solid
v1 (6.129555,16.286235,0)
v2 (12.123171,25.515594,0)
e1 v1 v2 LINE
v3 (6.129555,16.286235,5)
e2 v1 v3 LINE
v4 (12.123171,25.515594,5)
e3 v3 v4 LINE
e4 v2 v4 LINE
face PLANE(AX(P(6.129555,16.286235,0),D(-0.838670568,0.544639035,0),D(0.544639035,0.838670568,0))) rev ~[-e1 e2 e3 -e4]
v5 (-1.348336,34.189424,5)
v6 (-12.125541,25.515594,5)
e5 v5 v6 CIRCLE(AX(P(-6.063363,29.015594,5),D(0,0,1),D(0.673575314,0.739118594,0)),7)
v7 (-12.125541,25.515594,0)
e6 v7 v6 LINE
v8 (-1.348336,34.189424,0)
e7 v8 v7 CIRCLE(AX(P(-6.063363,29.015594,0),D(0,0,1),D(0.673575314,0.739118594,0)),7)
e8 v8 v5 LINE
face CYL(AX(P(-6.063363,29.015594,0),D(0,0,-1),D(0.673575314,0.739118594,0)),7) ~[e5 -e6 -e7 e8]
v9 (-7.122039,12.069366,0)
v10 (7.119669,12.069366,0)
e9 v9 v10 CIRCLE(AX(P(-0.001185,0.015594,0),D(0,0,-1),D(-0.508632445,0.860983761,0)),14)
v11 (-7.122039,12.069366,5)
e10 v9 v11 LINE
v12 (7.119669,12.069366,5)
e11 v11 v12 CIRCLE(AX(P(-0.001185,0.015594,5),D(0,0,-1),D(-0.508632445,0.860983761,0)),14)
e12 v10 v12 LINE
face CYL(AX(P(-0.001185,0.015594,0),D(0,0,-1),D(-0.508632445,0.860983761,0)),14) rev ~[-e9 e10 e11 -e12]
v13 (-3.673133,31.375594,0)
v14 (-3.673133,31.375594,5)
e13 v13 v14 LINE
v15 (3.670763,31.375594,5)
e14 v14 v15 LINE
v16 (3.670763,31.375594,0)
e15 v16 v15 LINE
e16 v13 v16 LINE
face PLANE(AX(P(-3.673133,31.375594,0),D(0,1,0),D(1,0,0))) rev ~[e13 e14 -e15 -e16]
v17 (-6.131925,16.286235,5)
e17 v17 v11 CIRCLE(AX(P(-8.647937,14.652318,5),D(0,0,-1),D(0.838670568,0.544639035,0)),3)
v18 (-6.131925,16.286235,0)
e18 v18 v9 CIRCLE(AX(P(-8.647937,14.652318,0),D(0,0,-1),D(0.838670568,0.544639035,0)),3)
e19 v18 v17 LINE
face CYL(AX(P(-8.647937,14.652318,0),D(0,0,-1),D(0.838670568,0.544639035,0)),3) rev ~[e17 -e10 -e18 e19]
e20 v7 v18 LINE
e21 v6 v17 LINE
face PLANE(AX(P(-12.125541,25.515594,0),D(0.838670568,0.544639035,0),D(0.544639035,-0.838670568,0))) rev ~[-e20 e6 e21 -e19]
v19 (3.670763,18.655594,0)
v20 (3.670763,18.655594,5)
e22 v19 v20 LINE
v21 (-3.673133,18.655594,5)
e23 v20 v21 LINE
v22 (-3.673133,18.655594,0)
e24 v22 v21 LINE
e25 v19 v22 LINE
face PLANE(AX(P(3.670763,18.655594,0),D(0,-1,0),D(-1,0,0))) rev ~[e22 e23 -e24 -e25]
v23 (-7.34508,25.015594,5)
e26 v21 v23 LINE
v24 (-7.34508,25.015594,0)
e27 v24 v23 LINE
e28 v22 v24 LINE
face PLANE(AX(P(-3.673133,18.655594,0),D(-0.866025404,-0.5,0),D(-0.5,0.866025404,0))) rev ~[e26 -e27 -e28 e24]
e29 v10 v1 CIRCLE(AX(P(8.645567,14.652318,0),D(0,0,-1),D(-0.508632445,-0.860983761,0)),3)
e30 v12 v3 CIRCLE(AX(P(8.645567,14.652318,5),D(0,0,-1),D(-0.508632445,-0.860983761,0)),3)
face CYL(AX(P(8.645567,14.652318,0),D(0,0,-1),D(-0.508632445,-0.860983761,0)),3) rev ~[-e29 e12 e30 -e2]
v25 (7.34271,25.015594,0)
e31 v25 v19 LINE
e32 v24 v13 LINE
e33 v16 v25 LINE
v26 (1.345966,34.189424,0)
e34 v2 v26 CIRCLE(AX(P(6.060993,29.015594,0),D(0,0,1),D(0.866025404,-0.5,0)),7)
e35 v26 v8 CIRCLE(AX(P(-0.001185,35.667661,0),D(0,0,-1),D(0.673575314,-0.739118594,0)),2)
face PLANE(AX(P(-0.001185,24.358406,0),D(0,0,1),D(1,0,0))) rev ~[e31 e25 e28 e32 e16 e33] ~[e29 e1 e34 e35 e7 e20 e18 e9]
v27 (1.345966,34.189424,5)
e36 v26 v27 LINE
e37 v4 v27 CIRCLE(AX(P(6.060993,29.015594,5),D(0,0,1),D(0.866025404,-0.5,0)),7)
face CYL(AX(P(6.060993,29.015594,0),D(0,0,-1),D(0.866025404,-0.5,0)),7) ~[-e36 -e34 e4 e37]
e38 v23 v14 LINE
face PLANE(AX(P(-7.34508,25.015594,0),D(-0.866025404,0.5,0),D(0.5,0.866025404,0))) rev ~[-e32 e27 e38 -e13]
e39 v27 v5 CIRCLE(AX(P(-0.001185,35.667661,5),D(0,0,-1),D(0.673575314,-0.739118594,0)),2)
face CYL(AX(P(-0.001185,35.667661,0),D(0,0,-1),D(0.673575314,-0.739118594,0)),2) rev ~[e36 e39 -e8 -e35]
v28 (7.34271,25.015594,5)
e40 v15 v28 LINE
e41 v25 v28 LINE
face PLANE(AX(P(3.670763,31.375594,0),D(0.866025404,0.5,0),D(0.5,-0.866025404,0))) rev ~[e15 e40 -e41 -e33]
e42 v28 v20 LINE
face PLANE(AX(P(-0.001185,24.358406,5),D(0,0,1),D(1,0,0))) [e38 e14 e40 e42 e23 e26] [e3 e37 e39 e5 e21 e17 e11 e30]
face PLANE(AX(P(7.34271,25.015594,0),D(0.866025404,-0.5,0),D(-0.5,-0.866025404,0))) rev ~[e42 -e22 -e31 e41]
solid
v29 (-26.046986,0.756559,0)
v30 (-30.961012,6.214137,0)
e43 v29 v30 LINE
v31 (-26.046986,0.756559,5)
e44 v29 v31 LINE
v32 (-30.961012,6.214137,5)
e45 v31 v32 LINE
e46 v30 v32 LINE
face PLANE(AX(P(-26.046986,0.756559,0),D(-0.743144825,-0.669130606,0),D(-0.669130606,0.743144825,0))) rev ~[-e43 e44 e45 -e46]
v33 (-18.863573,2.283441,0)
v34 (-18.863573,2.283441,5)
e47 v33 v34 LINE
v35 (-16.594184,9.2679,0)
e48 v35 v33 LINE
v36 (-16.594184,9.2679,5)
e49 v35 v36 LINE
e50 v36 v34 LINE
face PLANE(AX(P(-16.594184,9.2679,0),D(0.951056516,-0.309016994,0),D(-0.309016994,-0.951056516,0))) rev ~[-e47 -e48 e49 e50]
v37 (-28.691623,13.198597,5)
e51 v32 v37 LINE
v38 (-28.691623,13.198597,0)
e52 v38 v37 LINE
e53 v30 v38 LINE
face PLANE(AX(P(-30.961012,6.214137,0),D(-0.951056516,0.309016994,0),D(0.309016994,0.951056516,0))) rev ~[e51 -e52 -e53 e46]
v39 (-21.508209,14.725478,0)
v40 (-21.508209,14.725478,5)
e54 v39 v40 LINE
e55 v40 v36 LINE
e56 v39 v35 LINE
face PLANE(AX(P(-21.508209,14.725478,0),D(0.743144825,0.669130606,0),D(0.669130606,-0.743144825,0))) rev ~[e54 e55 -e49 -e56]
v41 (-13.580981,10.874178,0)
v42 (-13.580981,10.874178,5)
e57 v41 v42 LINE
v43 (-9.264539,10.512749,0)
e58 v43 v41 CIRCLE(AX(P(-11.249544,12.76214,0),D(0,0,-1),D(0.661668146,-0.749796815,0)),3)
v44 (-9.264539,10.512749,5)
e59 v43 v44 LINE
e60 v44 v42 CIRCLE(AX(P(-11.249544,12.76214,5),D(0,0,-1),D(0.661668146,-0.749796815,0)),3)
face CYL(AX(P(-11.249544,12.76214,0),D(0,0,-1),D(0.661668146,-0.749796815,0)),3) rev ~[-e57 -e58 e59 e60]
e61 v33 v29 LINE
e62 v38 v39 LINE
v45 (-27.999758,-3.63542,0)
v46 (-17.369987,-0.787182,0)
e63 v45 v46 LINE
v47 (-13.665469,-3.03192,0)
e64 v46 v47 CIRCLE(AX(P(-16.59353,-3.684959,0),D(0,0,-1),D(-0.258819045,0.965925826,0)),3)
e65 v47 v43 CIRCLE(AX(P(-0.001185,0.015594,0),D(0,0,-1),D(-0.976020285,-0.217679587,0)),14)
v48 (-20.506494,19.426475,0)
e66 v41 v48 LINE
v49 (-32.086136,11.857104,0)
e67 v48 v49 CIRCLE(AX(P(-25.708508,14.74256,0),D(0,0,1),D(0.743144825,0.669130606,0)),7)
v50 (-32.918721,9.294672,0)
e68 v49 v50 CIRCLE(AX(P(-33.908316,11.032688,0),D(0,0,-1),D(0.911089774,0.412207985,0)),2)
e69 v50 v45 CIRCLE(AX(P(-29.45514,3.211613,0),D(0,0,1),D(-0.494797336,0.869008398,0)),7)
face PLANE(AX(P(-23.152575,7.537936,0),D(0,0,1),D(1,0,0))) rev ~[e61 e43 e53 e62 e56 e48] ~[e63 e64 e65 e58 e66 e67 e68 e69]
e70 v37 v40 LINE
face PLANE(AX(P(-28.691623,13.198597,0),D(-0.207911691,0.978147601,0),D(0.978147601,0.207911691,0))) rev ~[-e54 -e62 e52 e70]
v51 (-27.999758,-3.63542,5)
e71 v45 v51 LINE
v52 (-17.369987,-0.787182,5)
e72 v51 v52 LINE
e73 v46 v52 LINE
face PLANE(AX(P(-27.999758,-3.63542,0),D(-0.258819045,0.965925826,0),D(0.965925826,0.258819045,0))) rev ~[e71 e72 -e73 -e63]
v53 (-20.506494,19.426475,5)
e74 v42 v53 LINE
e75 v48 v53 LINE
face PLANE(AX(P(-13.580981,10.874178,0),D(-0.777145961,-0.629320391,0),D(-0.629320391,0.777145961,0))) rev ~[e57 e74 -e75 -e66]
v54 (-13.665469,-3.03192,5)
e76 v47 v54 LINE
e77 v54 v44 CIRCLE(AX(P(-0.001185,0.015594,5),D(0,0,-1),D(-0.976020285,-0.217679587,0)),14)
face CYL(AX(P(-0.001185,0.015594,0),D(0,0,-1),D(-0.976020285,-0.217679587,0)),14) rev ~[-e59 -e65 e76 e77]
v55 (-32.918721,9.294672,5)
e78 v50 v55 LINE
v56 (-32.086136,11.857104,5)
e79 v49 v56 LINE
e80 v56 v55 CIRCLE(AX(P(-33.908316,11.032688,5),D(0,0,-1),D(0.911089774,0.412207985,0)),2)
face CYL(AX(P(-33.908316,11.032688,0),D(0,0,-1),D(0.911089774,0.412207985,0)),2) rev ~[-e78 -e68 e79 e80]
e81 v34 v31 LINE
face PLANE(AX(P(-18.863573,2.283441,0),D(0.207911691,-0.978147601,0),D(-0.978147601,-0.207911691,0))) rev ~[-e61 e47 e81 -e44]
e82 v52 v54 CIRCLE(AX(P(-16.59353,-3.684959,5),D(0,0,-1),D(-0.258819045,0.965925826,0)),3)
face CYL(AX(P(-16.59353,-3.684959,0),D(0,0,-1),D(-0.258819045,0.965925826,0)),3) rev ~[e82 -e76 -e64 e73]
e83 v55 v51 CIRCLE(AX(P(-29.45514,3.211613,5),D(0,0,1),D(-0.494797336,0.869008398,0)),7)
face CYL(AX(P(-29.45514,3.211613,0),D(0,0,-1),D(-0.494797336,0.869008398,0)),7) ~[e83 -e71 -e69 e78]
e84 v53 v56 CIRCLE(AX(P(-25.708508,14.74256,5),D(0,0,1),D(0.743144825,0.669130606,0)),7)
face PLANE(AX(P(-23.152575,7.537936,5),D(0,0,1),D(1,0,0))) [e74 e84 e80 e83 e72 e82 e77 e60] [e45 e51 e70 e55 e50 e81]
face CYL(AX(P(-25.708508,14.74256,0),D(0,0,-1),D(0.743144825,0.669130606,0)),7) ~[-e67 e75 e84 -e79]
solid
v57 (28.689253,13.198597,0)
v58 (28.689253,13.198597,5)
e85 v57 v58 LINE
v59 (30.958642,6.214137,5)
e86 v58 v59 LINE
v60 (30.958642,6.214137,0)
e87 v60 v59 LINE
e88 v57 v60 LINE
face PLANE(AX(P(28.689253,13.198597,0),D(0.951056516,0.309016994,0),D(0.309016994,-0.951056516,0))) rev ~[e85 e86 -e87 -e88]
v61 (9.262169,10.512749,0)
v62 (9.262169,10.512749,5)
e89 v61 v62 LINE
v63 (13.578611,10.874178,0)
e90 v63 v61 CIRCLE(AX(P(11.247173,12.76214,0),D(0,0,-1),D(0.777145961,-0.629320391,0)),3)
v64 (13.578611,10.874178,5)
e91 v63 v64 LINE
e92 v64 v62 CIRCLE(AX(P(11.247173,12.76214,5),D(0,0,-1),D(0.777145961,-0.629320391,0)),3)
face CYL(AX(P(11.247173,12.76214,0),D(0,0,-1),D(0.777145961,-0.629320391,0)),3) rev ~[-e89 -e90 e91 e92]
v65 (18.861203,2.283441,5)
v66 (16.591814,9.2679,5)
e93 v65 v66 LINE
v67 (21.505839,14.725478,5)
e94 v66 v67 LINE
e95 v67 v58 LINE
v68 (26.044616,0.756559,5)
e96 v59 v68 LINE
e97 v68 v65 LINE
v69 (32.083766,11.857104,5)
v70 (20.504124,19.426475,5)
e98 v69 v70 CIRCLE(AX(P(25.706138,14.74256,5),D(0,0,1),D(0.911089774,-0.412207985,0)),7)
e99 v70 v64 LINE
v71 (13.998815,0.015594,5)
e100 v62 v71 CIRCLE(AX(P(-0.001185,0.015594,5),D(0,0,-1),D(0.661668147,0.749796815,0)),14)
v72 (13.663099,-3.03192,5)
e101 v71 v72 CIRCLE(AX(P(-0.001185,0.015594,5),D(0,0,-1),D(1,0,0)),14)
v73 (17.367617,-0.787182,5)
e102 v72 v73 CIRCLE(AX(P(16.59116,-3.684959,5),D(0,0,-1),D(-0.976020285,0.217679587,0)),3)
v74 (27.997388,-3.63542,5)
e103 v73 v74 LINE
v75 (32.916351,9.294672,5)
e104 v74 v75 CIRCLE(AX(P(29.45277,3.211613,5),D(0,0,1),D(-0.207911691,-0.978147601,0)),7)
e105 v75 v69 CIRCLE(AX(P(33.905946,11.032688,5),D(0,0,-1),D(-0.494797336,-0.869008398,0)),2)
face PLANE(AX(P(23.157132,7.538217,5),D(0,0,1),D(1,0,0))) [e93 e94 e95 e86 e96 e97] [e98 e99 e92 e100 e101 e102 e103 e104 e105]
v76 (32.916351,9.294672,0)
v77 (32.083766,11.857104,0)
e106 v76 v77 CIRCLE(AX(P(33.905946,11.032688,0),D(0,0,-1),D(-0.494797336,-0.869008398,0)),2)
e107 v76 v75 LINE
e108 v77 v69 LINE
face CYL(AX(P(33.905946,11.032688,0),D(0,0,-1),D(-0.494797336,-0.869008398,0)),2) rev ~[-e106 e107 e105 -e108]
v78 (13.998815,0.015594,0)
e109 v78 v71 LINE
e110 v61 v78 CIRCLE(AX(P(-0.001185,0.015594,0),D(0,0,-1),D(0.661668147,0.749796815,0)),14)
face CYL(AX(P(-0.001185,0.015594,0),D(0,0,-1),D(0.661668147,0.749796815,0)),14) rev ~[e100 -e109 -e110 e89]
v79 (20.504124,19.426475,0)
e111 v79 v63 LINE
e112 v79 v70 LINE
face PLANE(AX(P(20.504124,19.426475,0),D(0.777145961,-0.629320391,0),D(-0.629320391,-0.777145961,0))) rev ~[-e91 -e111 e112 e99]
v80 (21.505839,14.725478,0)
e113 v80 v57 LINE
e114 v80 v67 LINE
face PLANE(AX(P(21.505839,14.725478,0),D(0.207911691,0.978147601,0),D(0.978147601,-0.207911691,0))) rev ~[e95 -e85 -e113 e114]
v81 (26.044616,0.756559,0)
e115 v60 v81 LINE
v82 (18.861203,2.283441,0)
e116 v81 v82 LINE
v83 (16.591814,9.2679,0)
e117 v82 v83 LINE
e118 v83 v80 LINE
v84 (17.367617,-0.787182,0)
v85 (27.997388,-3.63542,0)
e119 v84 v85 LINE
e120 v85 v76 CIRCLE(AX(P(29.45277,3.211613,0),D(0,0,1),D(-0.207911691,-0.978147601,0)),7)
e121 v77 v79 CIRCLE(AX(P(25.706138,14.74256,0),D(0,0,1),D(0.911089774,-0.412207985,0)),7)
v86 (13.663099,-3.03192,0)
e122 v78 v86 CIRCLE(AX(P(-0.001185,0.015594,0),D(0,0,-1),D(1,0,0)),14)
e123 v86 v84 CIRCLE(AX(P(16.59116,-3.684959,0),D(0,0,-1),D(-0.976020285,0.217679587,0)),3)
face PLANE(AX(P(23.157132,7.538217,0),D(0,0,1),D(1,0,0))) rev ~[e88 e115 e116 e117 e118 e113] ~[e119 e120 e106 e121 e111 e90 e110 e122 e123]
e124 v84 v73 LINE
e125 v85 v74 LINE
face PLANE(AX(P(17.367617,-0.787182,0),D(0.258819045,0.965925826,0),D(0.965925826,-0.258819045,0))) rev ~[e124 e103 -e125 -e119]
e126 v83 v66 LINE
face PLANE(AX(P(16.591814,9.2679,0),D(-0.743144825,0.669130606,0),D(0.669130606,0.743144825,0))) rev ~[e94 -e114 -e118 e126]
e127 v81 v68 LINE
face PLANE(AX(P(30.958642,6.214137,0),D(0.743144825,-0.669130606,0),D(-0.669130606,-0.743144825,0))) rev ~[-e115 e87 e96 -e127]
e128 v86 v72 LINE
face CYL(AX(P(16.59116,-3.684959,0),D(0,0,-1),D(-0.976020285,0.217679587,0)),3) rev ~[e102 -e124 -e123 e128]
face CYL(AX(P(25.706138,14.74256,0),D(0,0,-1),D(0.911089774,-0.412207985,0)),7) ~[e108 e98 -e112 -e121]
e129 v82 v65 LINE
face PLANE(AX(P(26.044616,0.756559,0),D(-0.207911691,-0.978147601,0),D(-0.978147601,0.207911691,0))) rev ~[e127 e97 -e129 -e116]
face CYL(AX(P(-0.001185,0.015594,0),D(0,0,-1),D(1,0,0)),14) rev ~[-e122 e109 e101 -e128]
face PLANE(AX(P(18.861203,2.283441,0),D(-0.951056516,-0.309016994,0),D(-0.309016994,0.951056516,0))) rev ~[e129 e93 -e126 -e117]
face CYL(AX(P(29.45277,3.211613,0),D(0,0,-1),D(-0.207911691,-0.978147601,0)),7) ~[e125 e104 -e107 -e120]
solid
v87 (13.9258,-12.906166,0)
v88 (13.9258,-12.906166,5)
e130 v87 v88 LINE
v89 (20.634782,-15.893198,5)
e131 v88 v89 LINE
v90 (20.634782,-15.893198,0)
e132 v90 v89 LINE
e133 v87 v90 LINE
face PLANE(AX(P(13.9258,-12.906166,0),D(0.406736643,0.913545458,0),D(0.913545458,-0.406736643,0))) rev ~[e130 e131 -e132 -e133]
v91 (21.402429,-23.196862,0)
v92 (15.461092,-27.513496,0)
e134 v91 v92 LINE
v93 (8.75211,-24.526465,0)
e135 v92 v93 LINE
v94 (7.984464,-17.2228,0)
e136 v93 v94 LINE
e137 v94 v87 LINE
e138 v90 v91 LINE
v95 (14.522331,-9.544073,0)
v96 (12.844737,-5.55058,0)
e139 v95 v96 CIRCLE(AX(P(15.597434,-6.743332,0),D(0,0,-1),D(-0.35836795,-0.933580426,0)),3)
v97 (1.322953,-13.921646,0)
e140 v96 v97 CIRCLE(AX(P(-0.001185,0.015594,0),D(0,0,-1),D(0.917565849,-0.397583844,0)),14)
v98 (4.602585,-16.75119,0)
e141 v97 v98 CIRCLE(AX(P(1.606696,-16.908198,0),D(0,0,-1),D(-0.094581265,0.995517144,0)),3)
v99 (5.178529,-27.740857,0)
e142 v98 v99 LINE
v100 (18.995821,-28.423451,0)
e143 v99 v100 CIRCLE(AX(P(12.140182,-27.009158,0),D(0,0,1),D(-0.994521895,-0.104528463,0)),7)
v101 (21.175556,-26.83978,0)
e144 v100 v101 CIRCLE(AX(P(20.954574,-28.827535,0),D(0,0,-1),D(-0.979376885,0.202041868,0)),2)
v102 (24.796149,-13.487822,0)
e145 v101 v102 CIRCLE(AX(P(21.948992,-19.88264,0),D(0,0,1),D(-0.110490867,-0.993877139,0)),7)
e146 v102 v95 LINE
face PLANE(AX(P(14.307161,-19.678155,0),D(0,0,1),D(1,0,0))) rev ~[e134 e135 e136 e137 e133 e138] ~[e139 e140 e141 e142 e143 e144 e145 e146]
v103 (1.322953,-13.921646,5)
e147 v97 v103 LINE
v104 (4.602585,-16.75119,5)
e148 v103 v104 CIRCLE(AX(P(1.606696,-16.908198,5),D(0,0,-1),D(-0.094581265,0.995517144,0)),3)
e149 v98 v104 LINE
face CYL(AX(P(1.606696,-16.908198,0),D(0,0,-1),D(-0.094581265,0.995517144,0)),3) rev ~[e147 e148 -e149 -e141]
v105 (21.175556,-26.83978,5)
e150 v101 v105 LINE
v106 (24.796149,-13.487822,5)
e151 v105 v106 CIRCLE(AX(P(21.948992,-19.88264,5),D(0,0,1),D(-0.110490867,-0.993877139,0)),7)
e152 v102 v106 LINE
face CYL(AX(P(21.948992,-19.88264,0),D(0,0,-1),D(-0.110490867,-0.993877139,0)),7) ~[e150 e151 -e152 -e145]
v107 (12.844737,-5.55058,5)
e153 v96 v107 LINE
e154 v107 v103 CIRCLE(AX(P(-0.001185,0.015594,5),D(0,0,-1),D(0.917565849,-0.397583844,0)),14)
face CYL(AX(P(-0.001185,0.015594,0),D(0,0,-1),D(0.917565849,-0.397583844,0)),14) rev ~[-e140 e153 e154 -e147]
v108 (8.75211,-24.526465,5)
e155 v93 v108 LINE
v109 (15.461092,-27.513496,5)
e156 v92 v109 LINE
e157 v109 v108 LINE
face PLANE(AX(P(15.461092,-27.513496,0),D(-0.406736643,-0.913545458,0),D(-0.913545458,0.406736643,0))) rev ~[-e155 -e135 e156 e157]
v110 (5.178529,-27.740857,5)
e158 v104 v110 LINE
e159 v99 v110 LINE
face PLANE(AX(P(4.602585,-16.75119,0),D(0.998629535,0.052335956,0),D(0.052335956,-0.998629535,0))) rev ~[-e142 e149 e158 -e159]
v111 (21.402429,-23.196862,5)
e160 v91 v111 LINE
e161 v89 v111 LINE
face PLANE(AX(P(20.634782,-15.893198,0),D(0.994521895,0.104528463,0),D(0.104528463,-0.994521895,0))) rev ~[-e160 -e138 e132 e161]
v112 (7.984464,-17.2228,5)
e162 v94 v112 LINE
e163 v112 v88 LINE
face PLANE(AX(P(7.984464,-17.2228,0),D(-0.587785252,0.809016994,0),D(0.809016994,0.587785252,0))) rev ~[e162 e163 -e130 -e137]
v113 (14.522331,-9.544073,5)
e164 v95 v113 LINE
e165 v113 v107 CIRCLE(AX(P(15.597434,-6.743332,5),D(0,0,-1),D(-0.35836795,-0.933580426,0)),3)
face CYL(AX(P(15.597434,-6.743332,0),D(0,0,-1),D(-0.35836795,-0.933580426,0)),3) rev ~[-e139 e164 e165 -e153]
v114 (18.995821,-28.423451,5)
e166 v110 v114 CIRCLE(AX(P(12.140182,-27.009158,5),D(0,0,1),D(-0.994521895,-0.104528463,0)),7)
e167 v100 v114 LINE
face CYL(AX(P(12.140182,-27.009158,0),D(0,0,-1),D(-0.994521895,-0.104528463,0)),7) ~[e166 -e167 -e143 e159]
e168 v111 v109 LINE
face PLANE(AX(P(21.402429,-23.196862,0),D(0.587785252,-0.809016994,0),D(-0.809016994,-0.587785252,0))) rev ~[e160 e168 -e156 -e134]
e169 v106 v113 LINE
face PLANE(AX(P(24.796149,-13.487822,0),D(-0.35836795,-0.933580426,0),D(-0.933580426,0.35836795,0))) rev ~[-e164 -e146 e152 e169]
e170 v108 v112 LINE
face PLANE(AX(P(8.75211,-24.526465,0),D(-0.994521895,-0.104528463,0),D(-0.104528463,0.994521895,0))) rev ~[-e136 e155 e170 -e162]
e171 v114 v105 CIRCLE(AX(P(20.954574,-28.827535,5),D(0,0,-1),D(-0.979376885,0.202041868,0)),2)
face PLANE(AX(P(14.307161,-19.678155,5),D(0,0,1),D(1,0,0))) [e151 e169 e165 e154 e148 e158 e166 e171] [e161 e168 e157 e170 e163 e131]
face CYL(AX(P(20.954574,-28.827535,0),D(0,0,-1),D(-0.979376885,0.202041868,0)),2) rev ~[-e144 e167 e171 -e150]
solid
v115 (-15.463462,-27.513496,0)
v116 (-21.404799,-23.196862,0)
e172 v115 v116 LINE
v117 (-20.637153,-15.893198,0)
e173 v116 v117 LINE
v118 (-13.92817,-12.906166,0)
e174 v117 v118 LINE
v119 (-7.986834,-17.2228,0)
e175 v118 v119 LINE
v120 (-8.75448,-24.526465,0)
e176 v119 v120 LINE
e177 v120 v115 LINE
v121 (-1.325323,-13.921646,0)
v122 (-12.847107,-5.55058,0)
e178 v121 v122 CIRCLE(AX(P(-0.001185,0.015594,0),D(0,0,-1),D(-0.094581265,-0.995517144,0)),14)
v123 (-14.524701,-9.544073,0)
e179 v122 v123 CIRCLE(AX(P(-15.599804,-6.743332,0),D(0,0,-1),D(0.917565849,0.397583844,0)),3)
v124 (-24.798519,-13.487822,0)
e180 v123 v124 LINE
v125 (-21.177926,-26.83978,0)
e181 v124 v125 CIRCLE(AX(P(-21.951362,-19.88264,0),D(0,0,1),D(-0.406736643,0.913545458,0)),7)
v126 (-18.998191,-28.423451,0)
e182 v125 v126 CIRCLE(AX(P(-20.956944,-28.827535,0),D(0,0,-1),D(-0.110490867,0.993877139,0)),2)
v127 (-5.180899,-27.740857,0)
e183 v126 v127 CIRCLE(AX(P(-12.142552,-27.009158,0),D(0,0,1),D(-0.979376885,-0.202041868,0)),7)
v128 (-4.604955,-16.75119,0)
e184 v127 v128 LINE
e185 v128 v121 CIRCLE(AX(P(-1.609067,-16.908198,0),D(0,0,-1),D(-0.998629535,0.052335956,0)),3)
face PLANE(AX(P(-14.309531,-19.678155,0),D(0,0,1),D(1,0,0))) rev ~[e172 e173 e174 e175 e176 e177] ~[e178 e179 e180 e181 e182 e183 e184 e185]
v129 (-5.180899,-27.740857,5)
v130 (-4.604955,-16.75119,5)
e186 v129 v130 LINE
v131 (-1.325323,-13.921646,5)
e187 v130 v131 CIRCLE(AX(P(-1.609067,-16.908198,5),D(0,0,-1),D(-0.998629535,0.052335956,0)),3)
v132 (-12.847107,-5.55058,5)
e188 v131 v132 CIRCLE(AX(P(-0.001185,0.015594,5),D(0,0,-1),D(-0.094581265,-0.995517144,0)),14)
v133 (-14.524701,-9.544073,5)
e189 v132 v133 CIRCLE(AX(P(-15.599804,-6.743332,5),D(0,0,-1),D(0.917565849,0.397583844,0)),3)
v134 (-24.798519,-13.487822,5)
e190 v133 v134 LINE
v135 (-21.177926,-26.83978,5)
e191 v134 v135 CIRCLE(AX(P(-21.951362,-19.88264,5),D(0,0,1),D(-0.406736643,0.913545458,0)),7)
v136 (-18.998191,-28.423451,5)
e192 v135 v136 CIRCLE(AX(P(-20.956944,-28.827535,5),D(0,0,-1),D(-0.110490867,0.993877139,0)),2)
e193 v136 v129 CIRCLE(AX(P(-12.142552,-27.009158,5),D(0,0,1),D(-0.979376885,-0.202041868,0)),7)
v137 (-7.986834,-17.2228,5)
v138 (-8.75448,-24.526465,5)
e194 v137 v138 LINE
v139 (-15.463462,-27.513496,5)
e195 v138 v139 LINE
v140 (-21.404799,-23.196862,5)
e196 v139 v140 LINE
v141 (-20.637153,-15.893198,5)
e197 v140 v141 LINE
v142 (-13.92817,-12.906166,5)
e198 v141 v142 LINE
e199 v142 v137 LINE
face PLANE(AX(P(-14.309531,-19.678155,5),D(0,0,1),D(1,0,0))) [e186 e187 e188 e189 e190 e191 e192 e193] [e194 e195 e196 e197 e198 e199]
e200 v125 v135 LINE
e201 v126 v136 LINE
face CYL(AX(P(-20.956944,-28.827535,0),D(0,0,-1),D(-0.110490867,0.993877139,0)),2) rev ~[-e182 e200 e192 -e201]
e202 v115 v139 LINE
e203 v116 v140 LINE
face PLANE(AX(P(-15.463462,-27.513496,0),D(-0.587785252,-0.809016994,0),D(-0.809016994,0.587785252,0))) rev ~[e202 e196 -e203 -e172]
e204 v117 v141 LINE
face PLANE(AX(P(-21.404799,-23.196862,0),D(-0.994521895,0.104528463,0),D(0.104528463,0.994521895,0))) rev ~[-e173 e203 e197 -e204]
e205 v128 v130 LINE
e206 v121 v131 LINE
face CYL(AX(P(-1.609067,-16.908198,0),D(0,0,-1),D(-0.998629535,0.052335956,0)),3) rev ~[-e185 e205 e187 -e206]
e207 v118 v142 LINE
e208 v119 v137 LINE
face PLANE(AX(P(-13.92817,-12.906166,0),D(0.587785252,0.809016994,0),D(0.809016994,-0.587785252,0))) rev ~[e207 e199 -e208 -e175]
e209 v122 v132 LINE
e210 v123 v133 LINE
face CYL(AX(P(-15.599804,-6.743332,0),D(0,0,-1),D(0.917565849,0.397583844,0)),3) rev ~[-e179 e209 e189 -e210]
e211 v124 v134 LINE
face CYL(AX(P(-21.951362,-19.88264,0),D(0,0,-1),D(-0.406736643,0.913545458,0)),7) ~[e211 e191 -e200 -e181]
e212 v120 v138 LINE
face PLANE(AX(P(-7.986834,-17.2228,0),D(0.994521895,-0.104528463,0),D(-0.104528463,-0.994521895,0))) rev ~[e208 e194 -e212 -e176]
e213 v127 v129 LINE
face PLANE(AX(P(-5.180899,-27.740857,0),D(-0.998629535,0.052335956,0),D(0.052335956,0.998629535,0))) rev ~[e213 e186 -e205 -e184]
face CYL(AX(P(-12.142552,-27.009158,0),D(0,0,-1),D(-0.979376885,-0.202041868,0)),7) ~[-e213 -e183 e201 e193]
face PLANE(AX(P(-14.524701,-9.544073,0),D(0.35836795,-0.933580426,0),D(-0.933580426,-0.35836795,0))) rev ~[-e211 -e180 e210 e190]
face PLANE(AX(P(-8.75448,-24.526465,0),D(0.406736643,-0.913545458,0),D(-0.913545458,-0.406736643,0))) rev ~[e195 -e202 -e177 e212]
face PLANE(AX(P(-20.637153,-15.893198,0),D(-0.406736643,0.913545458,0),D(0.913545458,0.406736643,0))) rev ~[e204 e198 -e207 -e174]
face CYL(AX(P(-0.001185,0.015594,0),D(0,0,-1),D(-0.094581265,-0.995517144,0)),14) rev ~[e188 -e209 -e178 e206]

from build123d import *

# Parameters (mm, degrees)
F1_DEPTH = 5


# Not quite as in the source:
# - a feature names something its author has since deleted; it is built from what else it names


with BuildPart() as f1:
    # F0 (on Top) → F1 (new body)
    with BuildSketch(Plane.XY):
        with BuildLine():
            ThreePointArc((-13.665469042, -3.0319204432), (-13.3159762762, 4.3418317), (-9.2645390994, 10.5127491897))
            ThreePointArc((-9.2645390994, 10.5127491897), (-11.4998669549, 9.7726015122), (-13.5809814233, 10.8741784618))
            Line((-13.5809814233, 10.8741784618), (-20.506494271, 19.426474585))
            ThreePointArc((-20.506494271, 19.426474585), (-29.538567909, 20.601795911), (-32.0861364699, 11.8571044442))
            ThreePointArc((-32.0861364699, 11.8571044442), (-32.0062029861, 10.4146544851), (-32.9187213461, 9.2946716776))
            ThreePointArc((-32.9187213461, 9.2946716776), (-35.997695766, 0.7226444411), (-27.9997581563, -3.6354203143))
            Line((-27.9997581563, -3.6354203143), (-17.3699870332, -0.7871817262))
            ThreePointArc((-17.3699870332, -0.7871817262), (-15.0388393758, -1.1192356462), (-13.665469042, -3.0319204432))
        make_face()
        Polygon((-28.6916231536, 13.1985965214), (-21.5082094645, 14.7254782362), (-16.5941842664, 9.267900353), (-18.8635727573, 2.2834407549), (-26.0469864464, 0.7565590401), (-30.9610116446, 6.2141369233), align=None, mode=Mode.SUBTRACT)
    extrude(amount=F1_DEPTH)


with BuildPart() as f1b:
    # F0 (on Top) → F1, piece 2 (new body)
    with BuildSketch(Plane.XY):
        with BuildLine():
            ThreePointArc((-1.3253227589, -13.9216462393), (-8.2301785802, -11.3106441425), (-12.847106931, -5.5505800398))
            ThreePointArc((-12.847106931, -5.5505800398), (-12.8339389546, -7.9052213736), (-14.5247006287, -9.5440728519))
            Line((-14.5247006287, -9.5440728519), (-24.7985187507, -13.4878221314))
            ThreePointArc((-24.7985187507, -13.4878221314), (-28.7073800051, -21.7146403569), (-21.1779261823, -26.8397803113))
            ThreePointArc((-21.1779261823, -26.8397803113), (-19.7813739443, -27.2095006015), (-18.998190678, -28.4234508549))
            ThreePointArc((-18.998190678, -28.4234508549), (-11.7971637379, -34.0006316328), (-5.1808992125, -27.7408570242))
            Line((-5.1808992125, -27.7408570242), (-4.6049551583, -16.7511898031))
            ThreePointArc((-4.6049551583, -16.7511898031), (-3.5687888714, -14.6367469374), (-1.3253227589, -13.9216462393))
        make_face()
        Polygon((-21.4047986615, -23.1968624525), (-20.6371525584, -15.8931976559), (-13.9281702523, -12.906166284), (-7.9868340493, -17.2227997087), (-8.7544801524, -24.5264645053), (-15.4634624585, -27.5134958771), align=None, mode=Mode.SUBTRACT)
    extrude(amount=F1_DEPTH)


with BuildPart() as f1c:
    # F0 (on Top) → F1, piece 3 (new body)
    with BuildSketch(Plane.XY):
        with BuildLine():
            ThreePointArc((7.1196691813, 12.0693664265), (5.7249926142, 13.9665713389), (6.1295548123, 16.2862348132))
            Line((6.1295548123, 16.2862348132), (12.1231706049, 25.5155937788))
            ThreePointArc((12.1231706049, 25.5155937788), (10.4499033622, 34.4688005315), (1.34596558, 34.1894239382))
            ThreePointArc((1.34596558, 34.1894239382), (-0.0011850481, 33.6676611266), (-1.3483356762, 34.1894239382))
            ThreePointArc((-1.3483356762, 34.1894239382), (-10.4522734584, 34.4688005315), (-12.1255407011, 25.5155937788))
            Line((-12.1255407011, 25.5155937788), (-6.1319249085, 16.2862348132))
            ThreePointArc((-6.1319249085, 16.2862348132), (-5.7273627104, 13.9665713389), (-7.1220392775, 12.0693664265))
            ThreePointArc((-7.1220392775, 12.0693664265), (-0.0011850481, 14.0155937788), (7.1196691813, 12.0693664265))
        make_face()
        Polygon((-7.3450804722, 25.0155937788), (-3.6731327602, 31.3755937788), (3.6707626639, 31.3755937788), (7.342710376, 25.0155937788), (3.6707626639, 18.6555937788), (-3.6731327602, 18.6555937788), align=None, mode=Mode.SUBTRACT)
    extrude(amount=F1_DEPTH)


with BuildPart() as f1d:
    # F0 (on Top) → F1, piece 4 (new body)
    with BuildSketch(Plane.XY):
        with BuildLine():
            ThreePointArc((14.5223305325, -9.5440728519), (12.8315688584, -7.9052213736), (12.8447368348, -5.5505800398))
            ThreePointArc((12.8447368348, -5.5505800398), (8.227808484, -11.3106441425), (1.3229526627, -13.9216462393))
            ThreePointArc((1.3229526627, -13.9216462393), (3.5664187752, -14.6367469374), (4.6025850621, -16.7511898031))
            Line((4.6025850621, -16.7511898031), (5.1785291162, -27.7408570242))
            ThreePointArc((5.1785291162, -27.7408570242), (11.7947936417, -34.0006316328), (18.9958205818, -28.4234508549))
            ThreePointArc((18.9958205818, -28.4234508549), (19.7790038481, -27.2095006015), (21.1755560861, -26.8397803113))
            ThreePointArc((21.1755560861, -26.8397803113), (28.7050099089, -21.7146403569), (24.7961486545, -13.4878221314))
            Line((24.7961486545, -13.4878221314), (14.5223305325, -9.5440728519))
        make_face()
        Polygon((7.9844639531, -17.2227997087), (13.9258001561, -12.906166284), (20.6347824622, -15.8931976559), (21.4024285653, -23.1968624525), (15.4610923623, -27.5134958771), (8.7521100562, -24.5264645053), align=None, mode=Mode.SUBTRACT)
    extrude(amount=F1_DEPTH)


with BuildPart() as f1e:
    # F0 (on Top) → F1, piece 5 (new body)
    with BuildSketch(Plane.XY):
        with BuildLine():
            ThreePointArc((13.5786113271, 10.8741784618), (11.4974968587, 9.7726015122), (9.2621690031, 10.5127491897))
            ThreePointArc((9.2621690031, 10.5127491897), (12.7598289539, 5.7737637694), (13.9988149519, 0.0155937788))
            ThreePointArc((13.9988149519, 0.0155937788), (13.9146328566, -1.5173811207), (13.6630989458, -3.0319204432))
            ThreePointArc((13.6630989458, -3.0319204432), (15.0364692796, -1.1192356462), (17.367616937, -0.7871817262))
            Line((17.367616937, -0.7871817262), (27.99738806, -3.6354203143))
            ThreePointArc((27.99738806, -3.6354203143), (35.9953256698, 0.7226444411), (32.9163512498, 9.2946716776))
            ThreePointArc((32.9163512498, 9.2946716776), (32.0038328898, 10.4146544851), (32.0837663737, 11.8571044442))
            ThreePointArc((32.0837663737, 11.8571044442), (29.5361978128, 20.601795911), (20.5041241748, 19.426474585))
            Line((20.5041241748, 19.426474585), (13.5786113271, 10.8741784618))
        make_face()
        Polygon((18.8612026611, 2.2834407549), (16.5918141702, 9.267900353), (21.5058393683, 14.7254782362), (28.6892530574, 13.1985965214), (30.9586415484, 6.2141369233), (26.0446163502, 0.7565590401), align=None, mode=Mode.SUBTRACT)
    extrude(amount=F1_DEPTH)


solid = Compound([f1.part, f1b.part, f1c.part, f1d.part, f1e.part])
